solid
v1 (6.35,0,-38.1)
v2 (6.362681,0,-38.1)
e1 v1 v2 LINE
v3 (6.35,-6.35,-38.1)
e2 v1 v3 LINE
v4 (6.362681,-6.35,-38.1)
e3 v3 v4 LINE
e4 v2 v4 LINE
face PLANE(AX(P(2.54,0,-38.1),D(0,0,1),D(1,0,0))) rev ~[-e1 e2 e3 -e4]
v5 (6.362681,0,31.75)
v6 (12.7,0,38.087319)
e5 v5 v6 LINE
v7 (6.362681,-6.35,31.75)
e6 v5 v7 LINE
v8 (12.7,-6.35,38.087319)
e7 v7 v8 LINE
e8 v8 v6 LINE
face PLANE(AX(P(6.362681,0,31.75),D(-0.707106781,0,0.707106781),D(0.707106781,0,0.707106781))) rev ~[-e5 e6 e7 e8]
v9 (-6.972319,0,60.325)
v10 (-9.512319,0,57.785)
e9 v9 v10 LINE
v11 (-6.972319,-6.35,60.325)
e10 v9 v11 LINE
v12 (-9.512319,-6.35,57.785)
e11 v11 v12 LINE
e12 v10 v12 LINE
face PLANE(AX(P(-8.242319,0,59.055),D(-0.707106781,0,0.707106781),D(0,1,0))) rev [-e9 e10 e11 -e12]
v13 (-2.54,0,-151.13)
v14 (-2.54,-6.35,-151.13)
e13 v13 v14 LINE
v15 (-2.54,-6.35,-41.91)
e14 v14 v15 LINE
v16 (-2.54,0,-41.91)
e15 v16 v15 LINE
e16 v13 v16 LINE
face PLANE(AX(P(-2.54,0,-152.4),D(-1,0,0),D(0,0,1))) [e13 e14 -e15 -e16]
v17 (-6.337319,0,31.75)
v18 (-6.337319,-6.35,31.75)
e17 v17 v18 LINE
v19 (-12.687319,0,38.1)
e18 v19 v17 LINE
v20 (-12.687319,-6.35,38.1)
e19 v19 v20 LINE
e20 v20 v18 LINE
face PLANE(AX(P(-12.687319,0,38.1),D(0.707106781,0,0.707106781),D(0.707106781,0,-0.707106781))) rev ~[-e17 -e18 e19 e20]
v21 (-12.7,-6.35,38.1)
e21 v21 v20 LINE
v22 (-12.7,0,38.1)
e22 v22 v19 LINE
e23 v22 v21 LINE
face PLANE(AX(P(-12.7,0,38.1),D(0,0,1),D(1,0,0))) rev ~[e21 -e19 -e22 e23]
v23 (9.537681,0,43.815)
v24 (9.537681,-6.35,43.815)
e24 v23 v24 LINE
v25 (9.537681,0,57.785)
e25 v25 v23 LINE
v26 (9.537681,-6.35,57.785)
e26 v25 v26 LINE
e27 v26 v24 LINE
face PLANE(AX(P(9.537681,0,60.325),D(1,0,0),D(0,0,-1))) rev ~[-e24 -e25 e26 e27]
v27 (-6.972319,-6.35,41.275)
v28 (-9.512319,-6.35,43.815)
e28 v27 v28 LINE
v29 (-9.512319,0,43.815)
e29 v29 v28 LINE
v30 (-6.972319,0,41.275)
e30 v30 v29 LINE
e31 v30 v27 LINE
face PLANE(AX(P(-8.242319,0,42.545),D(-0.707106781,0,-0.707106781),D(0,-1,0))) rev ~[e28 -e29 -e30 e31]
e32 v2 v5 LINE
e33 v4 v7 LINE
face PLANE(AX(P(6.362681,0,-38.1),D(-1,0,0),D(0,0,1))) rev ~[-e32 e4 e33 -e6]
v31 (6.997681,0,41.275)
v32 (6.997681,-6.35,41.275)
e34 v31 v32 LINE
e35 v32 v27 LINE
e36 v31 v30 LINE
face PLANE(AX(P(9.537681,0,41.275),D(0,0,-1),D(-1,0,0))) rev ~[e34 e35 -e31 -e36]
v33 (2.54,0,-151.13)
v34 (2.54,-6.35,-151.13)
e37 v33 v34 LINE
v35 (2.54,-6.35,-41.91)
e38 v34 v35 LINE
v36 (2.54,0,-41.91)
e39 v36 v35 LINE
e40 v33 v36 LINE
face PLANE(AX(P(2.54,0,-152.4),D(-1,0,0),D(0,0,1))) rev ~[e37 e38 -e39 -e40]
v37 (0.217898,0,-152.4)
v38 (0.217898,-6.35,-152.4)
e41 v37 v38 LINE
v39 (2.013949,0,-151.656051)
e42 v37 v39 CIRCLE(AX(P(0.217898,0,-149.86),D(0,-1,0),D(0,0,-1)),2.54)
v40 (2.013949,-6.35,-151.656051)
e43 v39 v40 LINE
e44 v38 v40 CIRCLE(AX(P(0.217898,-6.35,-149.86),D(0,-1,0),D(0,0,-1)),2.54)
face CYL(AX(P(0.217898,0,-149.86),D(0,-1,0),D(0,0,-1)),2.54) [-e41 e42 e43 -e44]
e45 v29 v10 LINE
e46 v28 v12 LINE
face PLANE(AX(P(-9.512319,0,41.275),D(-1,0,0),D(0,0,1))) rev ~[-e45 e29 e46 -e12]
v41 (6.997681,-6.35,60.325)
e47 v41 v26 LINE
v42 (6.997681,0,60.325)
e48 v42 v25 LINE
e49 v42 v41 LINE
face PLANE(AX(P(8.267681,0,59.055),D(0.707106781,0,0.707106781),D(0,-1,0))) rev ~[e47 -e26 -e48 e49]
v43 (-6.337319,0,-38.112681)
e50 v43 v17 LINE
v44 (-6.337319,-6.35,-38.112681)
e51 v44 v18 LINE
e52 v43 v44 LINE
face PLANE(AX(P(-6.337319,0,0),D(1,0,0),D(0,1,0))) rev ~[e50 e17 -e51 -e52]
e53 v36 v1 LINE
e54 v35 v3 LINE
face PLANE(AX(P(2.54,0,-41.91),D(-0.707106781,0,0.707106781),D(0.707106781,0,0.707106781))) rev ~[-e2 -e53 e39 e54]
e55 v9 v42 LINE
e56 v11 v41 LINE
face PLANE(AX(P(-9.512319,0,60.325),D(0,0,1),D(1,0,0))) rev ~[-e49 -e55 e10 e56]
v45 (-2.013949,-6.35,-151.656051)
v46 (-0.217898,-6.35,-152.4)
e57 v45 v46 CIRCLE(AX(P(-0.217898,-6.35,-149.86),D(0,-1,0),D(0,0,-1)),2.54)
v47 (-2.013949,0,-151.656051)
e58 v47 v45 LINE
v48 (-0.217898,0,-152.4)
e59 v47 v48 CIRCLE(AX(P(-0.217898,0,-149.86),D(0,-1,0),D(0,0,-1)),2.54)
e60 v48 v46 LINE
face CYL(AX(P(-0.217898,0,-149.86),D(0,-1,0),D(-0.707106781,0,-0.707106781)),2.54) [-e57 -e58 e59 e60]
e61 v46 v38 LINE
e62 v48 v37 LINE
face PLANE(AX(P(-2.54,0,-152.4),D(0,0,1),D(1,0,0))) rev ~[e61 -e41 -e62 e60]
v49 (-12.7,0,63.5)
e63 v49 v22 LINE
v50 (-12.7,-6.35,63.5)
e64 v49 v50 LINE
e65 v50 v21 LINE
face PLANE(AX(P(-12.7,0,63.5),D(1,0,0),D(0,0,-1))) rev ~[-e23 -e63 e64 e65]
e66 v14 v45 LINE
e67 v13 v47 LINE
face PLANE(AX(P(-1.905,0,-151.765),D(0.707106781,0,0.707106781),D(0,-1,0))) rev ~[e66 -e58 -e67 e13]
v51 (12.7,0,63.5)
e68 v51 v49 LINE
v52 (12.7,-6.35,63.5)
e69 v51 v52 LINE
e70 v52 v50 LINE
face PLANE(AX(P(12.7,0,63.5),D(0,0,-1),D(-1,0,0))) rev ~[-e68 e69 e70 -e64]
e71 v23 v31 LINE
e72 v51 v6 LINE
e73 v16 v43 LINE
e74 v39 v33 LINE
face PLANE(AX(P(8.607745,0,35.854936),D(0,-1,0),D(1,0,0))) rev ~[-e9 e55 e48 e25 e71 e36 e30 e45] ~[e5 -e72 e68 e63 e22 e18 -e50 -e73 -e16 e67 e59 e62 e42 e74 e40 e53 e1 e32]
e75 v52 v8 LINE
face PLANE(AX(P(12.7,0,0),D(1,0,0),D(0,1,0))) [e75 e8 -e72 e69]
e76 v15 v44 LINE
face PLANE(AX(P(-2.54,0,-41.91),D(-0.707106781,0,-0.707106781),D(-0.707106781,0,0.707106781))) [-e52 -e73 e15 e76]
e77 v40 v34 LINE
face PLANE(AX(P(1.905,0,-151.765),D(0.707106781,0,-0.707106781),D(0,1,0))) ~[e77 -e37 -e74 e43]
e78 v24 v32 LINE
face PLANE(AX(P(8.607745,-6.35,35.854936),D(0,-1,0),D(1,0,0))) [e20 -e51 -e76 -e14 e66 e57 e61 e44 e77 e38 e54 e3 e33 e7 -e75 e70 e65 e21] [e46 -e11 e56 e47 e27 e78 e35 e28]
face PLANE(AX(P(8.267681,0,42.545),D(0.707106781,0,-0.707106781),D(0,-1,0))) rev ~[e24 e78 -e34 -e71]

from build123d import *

# Parameters (mm, degrees)
F0_W        = 5.08
F0_H        = 114.3
F1_DEPTH    = 6.35
F2_SIZE     = 1.27
F3_R        = 2.54
F4_T1_DEPTH = 6.35
F4_T6_DEPTH = 6.35
F5_SIZE     = 2.54
F6_T1_DEPTH = 6.35
F6_T6_DEPTH = 6.35


# Not quite as in the source:
# - a fillet or chamfer that OpenCascade refuses, or shapes differently, is made with other operations: its cross-section is extruded or revolved along the edge and cut away or added


with BuildPart() as f1:
    # F0 (on Front) → F1 (new body)
    with BuildSketch(Plane.XZ):
        Polygon((12.7, 38.1), (12.7, 63.5), (-12.7, 63.5), (-12.7, 38.1), (-6.3373190351, 38.1), (-6.3373190351, -38.1), (-2.54, -38.1), (2.54, -38.1), (6.3626809649, -38.1), (6.3626809649, 38.1), align=None)
        Polygon((-9.5123190351, 60.325), (9.5376809649, 60.325), (9.5376809649, 41.275), (6.3626809649, 41.275), (-6.3373190351, 41.275), (-9.5123190351, 41.275), align=None, mode=Mode.SUBTRACT)
        with Locations((0, -95.25)):
            Rectangle(F0_W, F0_H)
    extrude(amount=F1_DEPTH)

    # F2
    f2_edges = [f1.edges().sort_by_distance(p)[0] for p in [
        (-2.54, -3.175, -152.4),
        (2.54, -3.175, -152.4),
    ]]
    chamfer(f2_edges, length=F2_SIZE)

    # F3
    f3_edges = [f1.edges().sort_by_distance(p)[0] for p in [
        (-1.27, -3.175, -152.4),
        (1.27, -3.175, -152.4),
    ]]
    fillet(f3_edges, radius=F3_R)

    # F4: chamfer of 3.81 on 2 edges, made by hand

    # F4_s2 → F4_t1 (join)
    with BuildSketch(Plane.XZ):
        Polygon((2.54, -41.91), (6.35, -38.1), (2.54, -38.1), align=None)
    extrude(amount=F4_T1_DEPTH)


with BuildPart() as f4_tool4:
    # F4_s5 → F4_t6 (new body)
    with BuildSketch(Plane.XZ):
        Polygon((-2.54, -41.91), (-6.35, -38.1), (-2.54, -38.1), align=None)
    extrude(amount=F4_T6_DEPTH)

    split(bisect_by=Plane.YZ.offset(-6.3373190351), keep=Keep.TOP)


with BuildPart() as f1_1:
    add(f1.part)

    # F4_t3: union F4_tool4
    add(f4_tool4.part)

    # F5
    f5_edges = [f1_1.edges().sort_by_distance(p)[0] for p in [
        (-9.512319, -3.175, 60.325),
        (9.537681, -3.175, 60.325),
        (-9.512319, -3.175, 41.275),
        (9.537681, -3.175, 41.275),
    ]]
    chamfer(f5_edges, length=F5_SIZE)

    # F6: chamfer of 6.35 on 2 edges, made by hand

    # F6_s2 → F6_t1 (join)
    with BuildSketch(Plane.XZ):
        Polygon((-12.6873190351, 38.1), (-6.3373190351, 31.75), (-6.3373190351, 38.1), align=None)
    extrude(amount=F6_T1_DEPTH)


with BuildPart() as f6_tool4:
    # F6_s5 → F6_t6 (new body)
    with BuildSketch(Plane.XZ):
        Polygon((6.3626809649, 31.75), (12.7126809649, 38.1), (6.3626809649, 38.1), align=None)
    extrude(amount=F6_T6_DEPTH)

    split(bisect_by=Plane.YZ.offset(12.7), keep=Keep.BOTTOM)


with BuildPart() as f1_2:
    add(f1_1.part)

    # F6_t3: union F6_tool4
    add(f6_tool4.part)


solid = f1_2.part
